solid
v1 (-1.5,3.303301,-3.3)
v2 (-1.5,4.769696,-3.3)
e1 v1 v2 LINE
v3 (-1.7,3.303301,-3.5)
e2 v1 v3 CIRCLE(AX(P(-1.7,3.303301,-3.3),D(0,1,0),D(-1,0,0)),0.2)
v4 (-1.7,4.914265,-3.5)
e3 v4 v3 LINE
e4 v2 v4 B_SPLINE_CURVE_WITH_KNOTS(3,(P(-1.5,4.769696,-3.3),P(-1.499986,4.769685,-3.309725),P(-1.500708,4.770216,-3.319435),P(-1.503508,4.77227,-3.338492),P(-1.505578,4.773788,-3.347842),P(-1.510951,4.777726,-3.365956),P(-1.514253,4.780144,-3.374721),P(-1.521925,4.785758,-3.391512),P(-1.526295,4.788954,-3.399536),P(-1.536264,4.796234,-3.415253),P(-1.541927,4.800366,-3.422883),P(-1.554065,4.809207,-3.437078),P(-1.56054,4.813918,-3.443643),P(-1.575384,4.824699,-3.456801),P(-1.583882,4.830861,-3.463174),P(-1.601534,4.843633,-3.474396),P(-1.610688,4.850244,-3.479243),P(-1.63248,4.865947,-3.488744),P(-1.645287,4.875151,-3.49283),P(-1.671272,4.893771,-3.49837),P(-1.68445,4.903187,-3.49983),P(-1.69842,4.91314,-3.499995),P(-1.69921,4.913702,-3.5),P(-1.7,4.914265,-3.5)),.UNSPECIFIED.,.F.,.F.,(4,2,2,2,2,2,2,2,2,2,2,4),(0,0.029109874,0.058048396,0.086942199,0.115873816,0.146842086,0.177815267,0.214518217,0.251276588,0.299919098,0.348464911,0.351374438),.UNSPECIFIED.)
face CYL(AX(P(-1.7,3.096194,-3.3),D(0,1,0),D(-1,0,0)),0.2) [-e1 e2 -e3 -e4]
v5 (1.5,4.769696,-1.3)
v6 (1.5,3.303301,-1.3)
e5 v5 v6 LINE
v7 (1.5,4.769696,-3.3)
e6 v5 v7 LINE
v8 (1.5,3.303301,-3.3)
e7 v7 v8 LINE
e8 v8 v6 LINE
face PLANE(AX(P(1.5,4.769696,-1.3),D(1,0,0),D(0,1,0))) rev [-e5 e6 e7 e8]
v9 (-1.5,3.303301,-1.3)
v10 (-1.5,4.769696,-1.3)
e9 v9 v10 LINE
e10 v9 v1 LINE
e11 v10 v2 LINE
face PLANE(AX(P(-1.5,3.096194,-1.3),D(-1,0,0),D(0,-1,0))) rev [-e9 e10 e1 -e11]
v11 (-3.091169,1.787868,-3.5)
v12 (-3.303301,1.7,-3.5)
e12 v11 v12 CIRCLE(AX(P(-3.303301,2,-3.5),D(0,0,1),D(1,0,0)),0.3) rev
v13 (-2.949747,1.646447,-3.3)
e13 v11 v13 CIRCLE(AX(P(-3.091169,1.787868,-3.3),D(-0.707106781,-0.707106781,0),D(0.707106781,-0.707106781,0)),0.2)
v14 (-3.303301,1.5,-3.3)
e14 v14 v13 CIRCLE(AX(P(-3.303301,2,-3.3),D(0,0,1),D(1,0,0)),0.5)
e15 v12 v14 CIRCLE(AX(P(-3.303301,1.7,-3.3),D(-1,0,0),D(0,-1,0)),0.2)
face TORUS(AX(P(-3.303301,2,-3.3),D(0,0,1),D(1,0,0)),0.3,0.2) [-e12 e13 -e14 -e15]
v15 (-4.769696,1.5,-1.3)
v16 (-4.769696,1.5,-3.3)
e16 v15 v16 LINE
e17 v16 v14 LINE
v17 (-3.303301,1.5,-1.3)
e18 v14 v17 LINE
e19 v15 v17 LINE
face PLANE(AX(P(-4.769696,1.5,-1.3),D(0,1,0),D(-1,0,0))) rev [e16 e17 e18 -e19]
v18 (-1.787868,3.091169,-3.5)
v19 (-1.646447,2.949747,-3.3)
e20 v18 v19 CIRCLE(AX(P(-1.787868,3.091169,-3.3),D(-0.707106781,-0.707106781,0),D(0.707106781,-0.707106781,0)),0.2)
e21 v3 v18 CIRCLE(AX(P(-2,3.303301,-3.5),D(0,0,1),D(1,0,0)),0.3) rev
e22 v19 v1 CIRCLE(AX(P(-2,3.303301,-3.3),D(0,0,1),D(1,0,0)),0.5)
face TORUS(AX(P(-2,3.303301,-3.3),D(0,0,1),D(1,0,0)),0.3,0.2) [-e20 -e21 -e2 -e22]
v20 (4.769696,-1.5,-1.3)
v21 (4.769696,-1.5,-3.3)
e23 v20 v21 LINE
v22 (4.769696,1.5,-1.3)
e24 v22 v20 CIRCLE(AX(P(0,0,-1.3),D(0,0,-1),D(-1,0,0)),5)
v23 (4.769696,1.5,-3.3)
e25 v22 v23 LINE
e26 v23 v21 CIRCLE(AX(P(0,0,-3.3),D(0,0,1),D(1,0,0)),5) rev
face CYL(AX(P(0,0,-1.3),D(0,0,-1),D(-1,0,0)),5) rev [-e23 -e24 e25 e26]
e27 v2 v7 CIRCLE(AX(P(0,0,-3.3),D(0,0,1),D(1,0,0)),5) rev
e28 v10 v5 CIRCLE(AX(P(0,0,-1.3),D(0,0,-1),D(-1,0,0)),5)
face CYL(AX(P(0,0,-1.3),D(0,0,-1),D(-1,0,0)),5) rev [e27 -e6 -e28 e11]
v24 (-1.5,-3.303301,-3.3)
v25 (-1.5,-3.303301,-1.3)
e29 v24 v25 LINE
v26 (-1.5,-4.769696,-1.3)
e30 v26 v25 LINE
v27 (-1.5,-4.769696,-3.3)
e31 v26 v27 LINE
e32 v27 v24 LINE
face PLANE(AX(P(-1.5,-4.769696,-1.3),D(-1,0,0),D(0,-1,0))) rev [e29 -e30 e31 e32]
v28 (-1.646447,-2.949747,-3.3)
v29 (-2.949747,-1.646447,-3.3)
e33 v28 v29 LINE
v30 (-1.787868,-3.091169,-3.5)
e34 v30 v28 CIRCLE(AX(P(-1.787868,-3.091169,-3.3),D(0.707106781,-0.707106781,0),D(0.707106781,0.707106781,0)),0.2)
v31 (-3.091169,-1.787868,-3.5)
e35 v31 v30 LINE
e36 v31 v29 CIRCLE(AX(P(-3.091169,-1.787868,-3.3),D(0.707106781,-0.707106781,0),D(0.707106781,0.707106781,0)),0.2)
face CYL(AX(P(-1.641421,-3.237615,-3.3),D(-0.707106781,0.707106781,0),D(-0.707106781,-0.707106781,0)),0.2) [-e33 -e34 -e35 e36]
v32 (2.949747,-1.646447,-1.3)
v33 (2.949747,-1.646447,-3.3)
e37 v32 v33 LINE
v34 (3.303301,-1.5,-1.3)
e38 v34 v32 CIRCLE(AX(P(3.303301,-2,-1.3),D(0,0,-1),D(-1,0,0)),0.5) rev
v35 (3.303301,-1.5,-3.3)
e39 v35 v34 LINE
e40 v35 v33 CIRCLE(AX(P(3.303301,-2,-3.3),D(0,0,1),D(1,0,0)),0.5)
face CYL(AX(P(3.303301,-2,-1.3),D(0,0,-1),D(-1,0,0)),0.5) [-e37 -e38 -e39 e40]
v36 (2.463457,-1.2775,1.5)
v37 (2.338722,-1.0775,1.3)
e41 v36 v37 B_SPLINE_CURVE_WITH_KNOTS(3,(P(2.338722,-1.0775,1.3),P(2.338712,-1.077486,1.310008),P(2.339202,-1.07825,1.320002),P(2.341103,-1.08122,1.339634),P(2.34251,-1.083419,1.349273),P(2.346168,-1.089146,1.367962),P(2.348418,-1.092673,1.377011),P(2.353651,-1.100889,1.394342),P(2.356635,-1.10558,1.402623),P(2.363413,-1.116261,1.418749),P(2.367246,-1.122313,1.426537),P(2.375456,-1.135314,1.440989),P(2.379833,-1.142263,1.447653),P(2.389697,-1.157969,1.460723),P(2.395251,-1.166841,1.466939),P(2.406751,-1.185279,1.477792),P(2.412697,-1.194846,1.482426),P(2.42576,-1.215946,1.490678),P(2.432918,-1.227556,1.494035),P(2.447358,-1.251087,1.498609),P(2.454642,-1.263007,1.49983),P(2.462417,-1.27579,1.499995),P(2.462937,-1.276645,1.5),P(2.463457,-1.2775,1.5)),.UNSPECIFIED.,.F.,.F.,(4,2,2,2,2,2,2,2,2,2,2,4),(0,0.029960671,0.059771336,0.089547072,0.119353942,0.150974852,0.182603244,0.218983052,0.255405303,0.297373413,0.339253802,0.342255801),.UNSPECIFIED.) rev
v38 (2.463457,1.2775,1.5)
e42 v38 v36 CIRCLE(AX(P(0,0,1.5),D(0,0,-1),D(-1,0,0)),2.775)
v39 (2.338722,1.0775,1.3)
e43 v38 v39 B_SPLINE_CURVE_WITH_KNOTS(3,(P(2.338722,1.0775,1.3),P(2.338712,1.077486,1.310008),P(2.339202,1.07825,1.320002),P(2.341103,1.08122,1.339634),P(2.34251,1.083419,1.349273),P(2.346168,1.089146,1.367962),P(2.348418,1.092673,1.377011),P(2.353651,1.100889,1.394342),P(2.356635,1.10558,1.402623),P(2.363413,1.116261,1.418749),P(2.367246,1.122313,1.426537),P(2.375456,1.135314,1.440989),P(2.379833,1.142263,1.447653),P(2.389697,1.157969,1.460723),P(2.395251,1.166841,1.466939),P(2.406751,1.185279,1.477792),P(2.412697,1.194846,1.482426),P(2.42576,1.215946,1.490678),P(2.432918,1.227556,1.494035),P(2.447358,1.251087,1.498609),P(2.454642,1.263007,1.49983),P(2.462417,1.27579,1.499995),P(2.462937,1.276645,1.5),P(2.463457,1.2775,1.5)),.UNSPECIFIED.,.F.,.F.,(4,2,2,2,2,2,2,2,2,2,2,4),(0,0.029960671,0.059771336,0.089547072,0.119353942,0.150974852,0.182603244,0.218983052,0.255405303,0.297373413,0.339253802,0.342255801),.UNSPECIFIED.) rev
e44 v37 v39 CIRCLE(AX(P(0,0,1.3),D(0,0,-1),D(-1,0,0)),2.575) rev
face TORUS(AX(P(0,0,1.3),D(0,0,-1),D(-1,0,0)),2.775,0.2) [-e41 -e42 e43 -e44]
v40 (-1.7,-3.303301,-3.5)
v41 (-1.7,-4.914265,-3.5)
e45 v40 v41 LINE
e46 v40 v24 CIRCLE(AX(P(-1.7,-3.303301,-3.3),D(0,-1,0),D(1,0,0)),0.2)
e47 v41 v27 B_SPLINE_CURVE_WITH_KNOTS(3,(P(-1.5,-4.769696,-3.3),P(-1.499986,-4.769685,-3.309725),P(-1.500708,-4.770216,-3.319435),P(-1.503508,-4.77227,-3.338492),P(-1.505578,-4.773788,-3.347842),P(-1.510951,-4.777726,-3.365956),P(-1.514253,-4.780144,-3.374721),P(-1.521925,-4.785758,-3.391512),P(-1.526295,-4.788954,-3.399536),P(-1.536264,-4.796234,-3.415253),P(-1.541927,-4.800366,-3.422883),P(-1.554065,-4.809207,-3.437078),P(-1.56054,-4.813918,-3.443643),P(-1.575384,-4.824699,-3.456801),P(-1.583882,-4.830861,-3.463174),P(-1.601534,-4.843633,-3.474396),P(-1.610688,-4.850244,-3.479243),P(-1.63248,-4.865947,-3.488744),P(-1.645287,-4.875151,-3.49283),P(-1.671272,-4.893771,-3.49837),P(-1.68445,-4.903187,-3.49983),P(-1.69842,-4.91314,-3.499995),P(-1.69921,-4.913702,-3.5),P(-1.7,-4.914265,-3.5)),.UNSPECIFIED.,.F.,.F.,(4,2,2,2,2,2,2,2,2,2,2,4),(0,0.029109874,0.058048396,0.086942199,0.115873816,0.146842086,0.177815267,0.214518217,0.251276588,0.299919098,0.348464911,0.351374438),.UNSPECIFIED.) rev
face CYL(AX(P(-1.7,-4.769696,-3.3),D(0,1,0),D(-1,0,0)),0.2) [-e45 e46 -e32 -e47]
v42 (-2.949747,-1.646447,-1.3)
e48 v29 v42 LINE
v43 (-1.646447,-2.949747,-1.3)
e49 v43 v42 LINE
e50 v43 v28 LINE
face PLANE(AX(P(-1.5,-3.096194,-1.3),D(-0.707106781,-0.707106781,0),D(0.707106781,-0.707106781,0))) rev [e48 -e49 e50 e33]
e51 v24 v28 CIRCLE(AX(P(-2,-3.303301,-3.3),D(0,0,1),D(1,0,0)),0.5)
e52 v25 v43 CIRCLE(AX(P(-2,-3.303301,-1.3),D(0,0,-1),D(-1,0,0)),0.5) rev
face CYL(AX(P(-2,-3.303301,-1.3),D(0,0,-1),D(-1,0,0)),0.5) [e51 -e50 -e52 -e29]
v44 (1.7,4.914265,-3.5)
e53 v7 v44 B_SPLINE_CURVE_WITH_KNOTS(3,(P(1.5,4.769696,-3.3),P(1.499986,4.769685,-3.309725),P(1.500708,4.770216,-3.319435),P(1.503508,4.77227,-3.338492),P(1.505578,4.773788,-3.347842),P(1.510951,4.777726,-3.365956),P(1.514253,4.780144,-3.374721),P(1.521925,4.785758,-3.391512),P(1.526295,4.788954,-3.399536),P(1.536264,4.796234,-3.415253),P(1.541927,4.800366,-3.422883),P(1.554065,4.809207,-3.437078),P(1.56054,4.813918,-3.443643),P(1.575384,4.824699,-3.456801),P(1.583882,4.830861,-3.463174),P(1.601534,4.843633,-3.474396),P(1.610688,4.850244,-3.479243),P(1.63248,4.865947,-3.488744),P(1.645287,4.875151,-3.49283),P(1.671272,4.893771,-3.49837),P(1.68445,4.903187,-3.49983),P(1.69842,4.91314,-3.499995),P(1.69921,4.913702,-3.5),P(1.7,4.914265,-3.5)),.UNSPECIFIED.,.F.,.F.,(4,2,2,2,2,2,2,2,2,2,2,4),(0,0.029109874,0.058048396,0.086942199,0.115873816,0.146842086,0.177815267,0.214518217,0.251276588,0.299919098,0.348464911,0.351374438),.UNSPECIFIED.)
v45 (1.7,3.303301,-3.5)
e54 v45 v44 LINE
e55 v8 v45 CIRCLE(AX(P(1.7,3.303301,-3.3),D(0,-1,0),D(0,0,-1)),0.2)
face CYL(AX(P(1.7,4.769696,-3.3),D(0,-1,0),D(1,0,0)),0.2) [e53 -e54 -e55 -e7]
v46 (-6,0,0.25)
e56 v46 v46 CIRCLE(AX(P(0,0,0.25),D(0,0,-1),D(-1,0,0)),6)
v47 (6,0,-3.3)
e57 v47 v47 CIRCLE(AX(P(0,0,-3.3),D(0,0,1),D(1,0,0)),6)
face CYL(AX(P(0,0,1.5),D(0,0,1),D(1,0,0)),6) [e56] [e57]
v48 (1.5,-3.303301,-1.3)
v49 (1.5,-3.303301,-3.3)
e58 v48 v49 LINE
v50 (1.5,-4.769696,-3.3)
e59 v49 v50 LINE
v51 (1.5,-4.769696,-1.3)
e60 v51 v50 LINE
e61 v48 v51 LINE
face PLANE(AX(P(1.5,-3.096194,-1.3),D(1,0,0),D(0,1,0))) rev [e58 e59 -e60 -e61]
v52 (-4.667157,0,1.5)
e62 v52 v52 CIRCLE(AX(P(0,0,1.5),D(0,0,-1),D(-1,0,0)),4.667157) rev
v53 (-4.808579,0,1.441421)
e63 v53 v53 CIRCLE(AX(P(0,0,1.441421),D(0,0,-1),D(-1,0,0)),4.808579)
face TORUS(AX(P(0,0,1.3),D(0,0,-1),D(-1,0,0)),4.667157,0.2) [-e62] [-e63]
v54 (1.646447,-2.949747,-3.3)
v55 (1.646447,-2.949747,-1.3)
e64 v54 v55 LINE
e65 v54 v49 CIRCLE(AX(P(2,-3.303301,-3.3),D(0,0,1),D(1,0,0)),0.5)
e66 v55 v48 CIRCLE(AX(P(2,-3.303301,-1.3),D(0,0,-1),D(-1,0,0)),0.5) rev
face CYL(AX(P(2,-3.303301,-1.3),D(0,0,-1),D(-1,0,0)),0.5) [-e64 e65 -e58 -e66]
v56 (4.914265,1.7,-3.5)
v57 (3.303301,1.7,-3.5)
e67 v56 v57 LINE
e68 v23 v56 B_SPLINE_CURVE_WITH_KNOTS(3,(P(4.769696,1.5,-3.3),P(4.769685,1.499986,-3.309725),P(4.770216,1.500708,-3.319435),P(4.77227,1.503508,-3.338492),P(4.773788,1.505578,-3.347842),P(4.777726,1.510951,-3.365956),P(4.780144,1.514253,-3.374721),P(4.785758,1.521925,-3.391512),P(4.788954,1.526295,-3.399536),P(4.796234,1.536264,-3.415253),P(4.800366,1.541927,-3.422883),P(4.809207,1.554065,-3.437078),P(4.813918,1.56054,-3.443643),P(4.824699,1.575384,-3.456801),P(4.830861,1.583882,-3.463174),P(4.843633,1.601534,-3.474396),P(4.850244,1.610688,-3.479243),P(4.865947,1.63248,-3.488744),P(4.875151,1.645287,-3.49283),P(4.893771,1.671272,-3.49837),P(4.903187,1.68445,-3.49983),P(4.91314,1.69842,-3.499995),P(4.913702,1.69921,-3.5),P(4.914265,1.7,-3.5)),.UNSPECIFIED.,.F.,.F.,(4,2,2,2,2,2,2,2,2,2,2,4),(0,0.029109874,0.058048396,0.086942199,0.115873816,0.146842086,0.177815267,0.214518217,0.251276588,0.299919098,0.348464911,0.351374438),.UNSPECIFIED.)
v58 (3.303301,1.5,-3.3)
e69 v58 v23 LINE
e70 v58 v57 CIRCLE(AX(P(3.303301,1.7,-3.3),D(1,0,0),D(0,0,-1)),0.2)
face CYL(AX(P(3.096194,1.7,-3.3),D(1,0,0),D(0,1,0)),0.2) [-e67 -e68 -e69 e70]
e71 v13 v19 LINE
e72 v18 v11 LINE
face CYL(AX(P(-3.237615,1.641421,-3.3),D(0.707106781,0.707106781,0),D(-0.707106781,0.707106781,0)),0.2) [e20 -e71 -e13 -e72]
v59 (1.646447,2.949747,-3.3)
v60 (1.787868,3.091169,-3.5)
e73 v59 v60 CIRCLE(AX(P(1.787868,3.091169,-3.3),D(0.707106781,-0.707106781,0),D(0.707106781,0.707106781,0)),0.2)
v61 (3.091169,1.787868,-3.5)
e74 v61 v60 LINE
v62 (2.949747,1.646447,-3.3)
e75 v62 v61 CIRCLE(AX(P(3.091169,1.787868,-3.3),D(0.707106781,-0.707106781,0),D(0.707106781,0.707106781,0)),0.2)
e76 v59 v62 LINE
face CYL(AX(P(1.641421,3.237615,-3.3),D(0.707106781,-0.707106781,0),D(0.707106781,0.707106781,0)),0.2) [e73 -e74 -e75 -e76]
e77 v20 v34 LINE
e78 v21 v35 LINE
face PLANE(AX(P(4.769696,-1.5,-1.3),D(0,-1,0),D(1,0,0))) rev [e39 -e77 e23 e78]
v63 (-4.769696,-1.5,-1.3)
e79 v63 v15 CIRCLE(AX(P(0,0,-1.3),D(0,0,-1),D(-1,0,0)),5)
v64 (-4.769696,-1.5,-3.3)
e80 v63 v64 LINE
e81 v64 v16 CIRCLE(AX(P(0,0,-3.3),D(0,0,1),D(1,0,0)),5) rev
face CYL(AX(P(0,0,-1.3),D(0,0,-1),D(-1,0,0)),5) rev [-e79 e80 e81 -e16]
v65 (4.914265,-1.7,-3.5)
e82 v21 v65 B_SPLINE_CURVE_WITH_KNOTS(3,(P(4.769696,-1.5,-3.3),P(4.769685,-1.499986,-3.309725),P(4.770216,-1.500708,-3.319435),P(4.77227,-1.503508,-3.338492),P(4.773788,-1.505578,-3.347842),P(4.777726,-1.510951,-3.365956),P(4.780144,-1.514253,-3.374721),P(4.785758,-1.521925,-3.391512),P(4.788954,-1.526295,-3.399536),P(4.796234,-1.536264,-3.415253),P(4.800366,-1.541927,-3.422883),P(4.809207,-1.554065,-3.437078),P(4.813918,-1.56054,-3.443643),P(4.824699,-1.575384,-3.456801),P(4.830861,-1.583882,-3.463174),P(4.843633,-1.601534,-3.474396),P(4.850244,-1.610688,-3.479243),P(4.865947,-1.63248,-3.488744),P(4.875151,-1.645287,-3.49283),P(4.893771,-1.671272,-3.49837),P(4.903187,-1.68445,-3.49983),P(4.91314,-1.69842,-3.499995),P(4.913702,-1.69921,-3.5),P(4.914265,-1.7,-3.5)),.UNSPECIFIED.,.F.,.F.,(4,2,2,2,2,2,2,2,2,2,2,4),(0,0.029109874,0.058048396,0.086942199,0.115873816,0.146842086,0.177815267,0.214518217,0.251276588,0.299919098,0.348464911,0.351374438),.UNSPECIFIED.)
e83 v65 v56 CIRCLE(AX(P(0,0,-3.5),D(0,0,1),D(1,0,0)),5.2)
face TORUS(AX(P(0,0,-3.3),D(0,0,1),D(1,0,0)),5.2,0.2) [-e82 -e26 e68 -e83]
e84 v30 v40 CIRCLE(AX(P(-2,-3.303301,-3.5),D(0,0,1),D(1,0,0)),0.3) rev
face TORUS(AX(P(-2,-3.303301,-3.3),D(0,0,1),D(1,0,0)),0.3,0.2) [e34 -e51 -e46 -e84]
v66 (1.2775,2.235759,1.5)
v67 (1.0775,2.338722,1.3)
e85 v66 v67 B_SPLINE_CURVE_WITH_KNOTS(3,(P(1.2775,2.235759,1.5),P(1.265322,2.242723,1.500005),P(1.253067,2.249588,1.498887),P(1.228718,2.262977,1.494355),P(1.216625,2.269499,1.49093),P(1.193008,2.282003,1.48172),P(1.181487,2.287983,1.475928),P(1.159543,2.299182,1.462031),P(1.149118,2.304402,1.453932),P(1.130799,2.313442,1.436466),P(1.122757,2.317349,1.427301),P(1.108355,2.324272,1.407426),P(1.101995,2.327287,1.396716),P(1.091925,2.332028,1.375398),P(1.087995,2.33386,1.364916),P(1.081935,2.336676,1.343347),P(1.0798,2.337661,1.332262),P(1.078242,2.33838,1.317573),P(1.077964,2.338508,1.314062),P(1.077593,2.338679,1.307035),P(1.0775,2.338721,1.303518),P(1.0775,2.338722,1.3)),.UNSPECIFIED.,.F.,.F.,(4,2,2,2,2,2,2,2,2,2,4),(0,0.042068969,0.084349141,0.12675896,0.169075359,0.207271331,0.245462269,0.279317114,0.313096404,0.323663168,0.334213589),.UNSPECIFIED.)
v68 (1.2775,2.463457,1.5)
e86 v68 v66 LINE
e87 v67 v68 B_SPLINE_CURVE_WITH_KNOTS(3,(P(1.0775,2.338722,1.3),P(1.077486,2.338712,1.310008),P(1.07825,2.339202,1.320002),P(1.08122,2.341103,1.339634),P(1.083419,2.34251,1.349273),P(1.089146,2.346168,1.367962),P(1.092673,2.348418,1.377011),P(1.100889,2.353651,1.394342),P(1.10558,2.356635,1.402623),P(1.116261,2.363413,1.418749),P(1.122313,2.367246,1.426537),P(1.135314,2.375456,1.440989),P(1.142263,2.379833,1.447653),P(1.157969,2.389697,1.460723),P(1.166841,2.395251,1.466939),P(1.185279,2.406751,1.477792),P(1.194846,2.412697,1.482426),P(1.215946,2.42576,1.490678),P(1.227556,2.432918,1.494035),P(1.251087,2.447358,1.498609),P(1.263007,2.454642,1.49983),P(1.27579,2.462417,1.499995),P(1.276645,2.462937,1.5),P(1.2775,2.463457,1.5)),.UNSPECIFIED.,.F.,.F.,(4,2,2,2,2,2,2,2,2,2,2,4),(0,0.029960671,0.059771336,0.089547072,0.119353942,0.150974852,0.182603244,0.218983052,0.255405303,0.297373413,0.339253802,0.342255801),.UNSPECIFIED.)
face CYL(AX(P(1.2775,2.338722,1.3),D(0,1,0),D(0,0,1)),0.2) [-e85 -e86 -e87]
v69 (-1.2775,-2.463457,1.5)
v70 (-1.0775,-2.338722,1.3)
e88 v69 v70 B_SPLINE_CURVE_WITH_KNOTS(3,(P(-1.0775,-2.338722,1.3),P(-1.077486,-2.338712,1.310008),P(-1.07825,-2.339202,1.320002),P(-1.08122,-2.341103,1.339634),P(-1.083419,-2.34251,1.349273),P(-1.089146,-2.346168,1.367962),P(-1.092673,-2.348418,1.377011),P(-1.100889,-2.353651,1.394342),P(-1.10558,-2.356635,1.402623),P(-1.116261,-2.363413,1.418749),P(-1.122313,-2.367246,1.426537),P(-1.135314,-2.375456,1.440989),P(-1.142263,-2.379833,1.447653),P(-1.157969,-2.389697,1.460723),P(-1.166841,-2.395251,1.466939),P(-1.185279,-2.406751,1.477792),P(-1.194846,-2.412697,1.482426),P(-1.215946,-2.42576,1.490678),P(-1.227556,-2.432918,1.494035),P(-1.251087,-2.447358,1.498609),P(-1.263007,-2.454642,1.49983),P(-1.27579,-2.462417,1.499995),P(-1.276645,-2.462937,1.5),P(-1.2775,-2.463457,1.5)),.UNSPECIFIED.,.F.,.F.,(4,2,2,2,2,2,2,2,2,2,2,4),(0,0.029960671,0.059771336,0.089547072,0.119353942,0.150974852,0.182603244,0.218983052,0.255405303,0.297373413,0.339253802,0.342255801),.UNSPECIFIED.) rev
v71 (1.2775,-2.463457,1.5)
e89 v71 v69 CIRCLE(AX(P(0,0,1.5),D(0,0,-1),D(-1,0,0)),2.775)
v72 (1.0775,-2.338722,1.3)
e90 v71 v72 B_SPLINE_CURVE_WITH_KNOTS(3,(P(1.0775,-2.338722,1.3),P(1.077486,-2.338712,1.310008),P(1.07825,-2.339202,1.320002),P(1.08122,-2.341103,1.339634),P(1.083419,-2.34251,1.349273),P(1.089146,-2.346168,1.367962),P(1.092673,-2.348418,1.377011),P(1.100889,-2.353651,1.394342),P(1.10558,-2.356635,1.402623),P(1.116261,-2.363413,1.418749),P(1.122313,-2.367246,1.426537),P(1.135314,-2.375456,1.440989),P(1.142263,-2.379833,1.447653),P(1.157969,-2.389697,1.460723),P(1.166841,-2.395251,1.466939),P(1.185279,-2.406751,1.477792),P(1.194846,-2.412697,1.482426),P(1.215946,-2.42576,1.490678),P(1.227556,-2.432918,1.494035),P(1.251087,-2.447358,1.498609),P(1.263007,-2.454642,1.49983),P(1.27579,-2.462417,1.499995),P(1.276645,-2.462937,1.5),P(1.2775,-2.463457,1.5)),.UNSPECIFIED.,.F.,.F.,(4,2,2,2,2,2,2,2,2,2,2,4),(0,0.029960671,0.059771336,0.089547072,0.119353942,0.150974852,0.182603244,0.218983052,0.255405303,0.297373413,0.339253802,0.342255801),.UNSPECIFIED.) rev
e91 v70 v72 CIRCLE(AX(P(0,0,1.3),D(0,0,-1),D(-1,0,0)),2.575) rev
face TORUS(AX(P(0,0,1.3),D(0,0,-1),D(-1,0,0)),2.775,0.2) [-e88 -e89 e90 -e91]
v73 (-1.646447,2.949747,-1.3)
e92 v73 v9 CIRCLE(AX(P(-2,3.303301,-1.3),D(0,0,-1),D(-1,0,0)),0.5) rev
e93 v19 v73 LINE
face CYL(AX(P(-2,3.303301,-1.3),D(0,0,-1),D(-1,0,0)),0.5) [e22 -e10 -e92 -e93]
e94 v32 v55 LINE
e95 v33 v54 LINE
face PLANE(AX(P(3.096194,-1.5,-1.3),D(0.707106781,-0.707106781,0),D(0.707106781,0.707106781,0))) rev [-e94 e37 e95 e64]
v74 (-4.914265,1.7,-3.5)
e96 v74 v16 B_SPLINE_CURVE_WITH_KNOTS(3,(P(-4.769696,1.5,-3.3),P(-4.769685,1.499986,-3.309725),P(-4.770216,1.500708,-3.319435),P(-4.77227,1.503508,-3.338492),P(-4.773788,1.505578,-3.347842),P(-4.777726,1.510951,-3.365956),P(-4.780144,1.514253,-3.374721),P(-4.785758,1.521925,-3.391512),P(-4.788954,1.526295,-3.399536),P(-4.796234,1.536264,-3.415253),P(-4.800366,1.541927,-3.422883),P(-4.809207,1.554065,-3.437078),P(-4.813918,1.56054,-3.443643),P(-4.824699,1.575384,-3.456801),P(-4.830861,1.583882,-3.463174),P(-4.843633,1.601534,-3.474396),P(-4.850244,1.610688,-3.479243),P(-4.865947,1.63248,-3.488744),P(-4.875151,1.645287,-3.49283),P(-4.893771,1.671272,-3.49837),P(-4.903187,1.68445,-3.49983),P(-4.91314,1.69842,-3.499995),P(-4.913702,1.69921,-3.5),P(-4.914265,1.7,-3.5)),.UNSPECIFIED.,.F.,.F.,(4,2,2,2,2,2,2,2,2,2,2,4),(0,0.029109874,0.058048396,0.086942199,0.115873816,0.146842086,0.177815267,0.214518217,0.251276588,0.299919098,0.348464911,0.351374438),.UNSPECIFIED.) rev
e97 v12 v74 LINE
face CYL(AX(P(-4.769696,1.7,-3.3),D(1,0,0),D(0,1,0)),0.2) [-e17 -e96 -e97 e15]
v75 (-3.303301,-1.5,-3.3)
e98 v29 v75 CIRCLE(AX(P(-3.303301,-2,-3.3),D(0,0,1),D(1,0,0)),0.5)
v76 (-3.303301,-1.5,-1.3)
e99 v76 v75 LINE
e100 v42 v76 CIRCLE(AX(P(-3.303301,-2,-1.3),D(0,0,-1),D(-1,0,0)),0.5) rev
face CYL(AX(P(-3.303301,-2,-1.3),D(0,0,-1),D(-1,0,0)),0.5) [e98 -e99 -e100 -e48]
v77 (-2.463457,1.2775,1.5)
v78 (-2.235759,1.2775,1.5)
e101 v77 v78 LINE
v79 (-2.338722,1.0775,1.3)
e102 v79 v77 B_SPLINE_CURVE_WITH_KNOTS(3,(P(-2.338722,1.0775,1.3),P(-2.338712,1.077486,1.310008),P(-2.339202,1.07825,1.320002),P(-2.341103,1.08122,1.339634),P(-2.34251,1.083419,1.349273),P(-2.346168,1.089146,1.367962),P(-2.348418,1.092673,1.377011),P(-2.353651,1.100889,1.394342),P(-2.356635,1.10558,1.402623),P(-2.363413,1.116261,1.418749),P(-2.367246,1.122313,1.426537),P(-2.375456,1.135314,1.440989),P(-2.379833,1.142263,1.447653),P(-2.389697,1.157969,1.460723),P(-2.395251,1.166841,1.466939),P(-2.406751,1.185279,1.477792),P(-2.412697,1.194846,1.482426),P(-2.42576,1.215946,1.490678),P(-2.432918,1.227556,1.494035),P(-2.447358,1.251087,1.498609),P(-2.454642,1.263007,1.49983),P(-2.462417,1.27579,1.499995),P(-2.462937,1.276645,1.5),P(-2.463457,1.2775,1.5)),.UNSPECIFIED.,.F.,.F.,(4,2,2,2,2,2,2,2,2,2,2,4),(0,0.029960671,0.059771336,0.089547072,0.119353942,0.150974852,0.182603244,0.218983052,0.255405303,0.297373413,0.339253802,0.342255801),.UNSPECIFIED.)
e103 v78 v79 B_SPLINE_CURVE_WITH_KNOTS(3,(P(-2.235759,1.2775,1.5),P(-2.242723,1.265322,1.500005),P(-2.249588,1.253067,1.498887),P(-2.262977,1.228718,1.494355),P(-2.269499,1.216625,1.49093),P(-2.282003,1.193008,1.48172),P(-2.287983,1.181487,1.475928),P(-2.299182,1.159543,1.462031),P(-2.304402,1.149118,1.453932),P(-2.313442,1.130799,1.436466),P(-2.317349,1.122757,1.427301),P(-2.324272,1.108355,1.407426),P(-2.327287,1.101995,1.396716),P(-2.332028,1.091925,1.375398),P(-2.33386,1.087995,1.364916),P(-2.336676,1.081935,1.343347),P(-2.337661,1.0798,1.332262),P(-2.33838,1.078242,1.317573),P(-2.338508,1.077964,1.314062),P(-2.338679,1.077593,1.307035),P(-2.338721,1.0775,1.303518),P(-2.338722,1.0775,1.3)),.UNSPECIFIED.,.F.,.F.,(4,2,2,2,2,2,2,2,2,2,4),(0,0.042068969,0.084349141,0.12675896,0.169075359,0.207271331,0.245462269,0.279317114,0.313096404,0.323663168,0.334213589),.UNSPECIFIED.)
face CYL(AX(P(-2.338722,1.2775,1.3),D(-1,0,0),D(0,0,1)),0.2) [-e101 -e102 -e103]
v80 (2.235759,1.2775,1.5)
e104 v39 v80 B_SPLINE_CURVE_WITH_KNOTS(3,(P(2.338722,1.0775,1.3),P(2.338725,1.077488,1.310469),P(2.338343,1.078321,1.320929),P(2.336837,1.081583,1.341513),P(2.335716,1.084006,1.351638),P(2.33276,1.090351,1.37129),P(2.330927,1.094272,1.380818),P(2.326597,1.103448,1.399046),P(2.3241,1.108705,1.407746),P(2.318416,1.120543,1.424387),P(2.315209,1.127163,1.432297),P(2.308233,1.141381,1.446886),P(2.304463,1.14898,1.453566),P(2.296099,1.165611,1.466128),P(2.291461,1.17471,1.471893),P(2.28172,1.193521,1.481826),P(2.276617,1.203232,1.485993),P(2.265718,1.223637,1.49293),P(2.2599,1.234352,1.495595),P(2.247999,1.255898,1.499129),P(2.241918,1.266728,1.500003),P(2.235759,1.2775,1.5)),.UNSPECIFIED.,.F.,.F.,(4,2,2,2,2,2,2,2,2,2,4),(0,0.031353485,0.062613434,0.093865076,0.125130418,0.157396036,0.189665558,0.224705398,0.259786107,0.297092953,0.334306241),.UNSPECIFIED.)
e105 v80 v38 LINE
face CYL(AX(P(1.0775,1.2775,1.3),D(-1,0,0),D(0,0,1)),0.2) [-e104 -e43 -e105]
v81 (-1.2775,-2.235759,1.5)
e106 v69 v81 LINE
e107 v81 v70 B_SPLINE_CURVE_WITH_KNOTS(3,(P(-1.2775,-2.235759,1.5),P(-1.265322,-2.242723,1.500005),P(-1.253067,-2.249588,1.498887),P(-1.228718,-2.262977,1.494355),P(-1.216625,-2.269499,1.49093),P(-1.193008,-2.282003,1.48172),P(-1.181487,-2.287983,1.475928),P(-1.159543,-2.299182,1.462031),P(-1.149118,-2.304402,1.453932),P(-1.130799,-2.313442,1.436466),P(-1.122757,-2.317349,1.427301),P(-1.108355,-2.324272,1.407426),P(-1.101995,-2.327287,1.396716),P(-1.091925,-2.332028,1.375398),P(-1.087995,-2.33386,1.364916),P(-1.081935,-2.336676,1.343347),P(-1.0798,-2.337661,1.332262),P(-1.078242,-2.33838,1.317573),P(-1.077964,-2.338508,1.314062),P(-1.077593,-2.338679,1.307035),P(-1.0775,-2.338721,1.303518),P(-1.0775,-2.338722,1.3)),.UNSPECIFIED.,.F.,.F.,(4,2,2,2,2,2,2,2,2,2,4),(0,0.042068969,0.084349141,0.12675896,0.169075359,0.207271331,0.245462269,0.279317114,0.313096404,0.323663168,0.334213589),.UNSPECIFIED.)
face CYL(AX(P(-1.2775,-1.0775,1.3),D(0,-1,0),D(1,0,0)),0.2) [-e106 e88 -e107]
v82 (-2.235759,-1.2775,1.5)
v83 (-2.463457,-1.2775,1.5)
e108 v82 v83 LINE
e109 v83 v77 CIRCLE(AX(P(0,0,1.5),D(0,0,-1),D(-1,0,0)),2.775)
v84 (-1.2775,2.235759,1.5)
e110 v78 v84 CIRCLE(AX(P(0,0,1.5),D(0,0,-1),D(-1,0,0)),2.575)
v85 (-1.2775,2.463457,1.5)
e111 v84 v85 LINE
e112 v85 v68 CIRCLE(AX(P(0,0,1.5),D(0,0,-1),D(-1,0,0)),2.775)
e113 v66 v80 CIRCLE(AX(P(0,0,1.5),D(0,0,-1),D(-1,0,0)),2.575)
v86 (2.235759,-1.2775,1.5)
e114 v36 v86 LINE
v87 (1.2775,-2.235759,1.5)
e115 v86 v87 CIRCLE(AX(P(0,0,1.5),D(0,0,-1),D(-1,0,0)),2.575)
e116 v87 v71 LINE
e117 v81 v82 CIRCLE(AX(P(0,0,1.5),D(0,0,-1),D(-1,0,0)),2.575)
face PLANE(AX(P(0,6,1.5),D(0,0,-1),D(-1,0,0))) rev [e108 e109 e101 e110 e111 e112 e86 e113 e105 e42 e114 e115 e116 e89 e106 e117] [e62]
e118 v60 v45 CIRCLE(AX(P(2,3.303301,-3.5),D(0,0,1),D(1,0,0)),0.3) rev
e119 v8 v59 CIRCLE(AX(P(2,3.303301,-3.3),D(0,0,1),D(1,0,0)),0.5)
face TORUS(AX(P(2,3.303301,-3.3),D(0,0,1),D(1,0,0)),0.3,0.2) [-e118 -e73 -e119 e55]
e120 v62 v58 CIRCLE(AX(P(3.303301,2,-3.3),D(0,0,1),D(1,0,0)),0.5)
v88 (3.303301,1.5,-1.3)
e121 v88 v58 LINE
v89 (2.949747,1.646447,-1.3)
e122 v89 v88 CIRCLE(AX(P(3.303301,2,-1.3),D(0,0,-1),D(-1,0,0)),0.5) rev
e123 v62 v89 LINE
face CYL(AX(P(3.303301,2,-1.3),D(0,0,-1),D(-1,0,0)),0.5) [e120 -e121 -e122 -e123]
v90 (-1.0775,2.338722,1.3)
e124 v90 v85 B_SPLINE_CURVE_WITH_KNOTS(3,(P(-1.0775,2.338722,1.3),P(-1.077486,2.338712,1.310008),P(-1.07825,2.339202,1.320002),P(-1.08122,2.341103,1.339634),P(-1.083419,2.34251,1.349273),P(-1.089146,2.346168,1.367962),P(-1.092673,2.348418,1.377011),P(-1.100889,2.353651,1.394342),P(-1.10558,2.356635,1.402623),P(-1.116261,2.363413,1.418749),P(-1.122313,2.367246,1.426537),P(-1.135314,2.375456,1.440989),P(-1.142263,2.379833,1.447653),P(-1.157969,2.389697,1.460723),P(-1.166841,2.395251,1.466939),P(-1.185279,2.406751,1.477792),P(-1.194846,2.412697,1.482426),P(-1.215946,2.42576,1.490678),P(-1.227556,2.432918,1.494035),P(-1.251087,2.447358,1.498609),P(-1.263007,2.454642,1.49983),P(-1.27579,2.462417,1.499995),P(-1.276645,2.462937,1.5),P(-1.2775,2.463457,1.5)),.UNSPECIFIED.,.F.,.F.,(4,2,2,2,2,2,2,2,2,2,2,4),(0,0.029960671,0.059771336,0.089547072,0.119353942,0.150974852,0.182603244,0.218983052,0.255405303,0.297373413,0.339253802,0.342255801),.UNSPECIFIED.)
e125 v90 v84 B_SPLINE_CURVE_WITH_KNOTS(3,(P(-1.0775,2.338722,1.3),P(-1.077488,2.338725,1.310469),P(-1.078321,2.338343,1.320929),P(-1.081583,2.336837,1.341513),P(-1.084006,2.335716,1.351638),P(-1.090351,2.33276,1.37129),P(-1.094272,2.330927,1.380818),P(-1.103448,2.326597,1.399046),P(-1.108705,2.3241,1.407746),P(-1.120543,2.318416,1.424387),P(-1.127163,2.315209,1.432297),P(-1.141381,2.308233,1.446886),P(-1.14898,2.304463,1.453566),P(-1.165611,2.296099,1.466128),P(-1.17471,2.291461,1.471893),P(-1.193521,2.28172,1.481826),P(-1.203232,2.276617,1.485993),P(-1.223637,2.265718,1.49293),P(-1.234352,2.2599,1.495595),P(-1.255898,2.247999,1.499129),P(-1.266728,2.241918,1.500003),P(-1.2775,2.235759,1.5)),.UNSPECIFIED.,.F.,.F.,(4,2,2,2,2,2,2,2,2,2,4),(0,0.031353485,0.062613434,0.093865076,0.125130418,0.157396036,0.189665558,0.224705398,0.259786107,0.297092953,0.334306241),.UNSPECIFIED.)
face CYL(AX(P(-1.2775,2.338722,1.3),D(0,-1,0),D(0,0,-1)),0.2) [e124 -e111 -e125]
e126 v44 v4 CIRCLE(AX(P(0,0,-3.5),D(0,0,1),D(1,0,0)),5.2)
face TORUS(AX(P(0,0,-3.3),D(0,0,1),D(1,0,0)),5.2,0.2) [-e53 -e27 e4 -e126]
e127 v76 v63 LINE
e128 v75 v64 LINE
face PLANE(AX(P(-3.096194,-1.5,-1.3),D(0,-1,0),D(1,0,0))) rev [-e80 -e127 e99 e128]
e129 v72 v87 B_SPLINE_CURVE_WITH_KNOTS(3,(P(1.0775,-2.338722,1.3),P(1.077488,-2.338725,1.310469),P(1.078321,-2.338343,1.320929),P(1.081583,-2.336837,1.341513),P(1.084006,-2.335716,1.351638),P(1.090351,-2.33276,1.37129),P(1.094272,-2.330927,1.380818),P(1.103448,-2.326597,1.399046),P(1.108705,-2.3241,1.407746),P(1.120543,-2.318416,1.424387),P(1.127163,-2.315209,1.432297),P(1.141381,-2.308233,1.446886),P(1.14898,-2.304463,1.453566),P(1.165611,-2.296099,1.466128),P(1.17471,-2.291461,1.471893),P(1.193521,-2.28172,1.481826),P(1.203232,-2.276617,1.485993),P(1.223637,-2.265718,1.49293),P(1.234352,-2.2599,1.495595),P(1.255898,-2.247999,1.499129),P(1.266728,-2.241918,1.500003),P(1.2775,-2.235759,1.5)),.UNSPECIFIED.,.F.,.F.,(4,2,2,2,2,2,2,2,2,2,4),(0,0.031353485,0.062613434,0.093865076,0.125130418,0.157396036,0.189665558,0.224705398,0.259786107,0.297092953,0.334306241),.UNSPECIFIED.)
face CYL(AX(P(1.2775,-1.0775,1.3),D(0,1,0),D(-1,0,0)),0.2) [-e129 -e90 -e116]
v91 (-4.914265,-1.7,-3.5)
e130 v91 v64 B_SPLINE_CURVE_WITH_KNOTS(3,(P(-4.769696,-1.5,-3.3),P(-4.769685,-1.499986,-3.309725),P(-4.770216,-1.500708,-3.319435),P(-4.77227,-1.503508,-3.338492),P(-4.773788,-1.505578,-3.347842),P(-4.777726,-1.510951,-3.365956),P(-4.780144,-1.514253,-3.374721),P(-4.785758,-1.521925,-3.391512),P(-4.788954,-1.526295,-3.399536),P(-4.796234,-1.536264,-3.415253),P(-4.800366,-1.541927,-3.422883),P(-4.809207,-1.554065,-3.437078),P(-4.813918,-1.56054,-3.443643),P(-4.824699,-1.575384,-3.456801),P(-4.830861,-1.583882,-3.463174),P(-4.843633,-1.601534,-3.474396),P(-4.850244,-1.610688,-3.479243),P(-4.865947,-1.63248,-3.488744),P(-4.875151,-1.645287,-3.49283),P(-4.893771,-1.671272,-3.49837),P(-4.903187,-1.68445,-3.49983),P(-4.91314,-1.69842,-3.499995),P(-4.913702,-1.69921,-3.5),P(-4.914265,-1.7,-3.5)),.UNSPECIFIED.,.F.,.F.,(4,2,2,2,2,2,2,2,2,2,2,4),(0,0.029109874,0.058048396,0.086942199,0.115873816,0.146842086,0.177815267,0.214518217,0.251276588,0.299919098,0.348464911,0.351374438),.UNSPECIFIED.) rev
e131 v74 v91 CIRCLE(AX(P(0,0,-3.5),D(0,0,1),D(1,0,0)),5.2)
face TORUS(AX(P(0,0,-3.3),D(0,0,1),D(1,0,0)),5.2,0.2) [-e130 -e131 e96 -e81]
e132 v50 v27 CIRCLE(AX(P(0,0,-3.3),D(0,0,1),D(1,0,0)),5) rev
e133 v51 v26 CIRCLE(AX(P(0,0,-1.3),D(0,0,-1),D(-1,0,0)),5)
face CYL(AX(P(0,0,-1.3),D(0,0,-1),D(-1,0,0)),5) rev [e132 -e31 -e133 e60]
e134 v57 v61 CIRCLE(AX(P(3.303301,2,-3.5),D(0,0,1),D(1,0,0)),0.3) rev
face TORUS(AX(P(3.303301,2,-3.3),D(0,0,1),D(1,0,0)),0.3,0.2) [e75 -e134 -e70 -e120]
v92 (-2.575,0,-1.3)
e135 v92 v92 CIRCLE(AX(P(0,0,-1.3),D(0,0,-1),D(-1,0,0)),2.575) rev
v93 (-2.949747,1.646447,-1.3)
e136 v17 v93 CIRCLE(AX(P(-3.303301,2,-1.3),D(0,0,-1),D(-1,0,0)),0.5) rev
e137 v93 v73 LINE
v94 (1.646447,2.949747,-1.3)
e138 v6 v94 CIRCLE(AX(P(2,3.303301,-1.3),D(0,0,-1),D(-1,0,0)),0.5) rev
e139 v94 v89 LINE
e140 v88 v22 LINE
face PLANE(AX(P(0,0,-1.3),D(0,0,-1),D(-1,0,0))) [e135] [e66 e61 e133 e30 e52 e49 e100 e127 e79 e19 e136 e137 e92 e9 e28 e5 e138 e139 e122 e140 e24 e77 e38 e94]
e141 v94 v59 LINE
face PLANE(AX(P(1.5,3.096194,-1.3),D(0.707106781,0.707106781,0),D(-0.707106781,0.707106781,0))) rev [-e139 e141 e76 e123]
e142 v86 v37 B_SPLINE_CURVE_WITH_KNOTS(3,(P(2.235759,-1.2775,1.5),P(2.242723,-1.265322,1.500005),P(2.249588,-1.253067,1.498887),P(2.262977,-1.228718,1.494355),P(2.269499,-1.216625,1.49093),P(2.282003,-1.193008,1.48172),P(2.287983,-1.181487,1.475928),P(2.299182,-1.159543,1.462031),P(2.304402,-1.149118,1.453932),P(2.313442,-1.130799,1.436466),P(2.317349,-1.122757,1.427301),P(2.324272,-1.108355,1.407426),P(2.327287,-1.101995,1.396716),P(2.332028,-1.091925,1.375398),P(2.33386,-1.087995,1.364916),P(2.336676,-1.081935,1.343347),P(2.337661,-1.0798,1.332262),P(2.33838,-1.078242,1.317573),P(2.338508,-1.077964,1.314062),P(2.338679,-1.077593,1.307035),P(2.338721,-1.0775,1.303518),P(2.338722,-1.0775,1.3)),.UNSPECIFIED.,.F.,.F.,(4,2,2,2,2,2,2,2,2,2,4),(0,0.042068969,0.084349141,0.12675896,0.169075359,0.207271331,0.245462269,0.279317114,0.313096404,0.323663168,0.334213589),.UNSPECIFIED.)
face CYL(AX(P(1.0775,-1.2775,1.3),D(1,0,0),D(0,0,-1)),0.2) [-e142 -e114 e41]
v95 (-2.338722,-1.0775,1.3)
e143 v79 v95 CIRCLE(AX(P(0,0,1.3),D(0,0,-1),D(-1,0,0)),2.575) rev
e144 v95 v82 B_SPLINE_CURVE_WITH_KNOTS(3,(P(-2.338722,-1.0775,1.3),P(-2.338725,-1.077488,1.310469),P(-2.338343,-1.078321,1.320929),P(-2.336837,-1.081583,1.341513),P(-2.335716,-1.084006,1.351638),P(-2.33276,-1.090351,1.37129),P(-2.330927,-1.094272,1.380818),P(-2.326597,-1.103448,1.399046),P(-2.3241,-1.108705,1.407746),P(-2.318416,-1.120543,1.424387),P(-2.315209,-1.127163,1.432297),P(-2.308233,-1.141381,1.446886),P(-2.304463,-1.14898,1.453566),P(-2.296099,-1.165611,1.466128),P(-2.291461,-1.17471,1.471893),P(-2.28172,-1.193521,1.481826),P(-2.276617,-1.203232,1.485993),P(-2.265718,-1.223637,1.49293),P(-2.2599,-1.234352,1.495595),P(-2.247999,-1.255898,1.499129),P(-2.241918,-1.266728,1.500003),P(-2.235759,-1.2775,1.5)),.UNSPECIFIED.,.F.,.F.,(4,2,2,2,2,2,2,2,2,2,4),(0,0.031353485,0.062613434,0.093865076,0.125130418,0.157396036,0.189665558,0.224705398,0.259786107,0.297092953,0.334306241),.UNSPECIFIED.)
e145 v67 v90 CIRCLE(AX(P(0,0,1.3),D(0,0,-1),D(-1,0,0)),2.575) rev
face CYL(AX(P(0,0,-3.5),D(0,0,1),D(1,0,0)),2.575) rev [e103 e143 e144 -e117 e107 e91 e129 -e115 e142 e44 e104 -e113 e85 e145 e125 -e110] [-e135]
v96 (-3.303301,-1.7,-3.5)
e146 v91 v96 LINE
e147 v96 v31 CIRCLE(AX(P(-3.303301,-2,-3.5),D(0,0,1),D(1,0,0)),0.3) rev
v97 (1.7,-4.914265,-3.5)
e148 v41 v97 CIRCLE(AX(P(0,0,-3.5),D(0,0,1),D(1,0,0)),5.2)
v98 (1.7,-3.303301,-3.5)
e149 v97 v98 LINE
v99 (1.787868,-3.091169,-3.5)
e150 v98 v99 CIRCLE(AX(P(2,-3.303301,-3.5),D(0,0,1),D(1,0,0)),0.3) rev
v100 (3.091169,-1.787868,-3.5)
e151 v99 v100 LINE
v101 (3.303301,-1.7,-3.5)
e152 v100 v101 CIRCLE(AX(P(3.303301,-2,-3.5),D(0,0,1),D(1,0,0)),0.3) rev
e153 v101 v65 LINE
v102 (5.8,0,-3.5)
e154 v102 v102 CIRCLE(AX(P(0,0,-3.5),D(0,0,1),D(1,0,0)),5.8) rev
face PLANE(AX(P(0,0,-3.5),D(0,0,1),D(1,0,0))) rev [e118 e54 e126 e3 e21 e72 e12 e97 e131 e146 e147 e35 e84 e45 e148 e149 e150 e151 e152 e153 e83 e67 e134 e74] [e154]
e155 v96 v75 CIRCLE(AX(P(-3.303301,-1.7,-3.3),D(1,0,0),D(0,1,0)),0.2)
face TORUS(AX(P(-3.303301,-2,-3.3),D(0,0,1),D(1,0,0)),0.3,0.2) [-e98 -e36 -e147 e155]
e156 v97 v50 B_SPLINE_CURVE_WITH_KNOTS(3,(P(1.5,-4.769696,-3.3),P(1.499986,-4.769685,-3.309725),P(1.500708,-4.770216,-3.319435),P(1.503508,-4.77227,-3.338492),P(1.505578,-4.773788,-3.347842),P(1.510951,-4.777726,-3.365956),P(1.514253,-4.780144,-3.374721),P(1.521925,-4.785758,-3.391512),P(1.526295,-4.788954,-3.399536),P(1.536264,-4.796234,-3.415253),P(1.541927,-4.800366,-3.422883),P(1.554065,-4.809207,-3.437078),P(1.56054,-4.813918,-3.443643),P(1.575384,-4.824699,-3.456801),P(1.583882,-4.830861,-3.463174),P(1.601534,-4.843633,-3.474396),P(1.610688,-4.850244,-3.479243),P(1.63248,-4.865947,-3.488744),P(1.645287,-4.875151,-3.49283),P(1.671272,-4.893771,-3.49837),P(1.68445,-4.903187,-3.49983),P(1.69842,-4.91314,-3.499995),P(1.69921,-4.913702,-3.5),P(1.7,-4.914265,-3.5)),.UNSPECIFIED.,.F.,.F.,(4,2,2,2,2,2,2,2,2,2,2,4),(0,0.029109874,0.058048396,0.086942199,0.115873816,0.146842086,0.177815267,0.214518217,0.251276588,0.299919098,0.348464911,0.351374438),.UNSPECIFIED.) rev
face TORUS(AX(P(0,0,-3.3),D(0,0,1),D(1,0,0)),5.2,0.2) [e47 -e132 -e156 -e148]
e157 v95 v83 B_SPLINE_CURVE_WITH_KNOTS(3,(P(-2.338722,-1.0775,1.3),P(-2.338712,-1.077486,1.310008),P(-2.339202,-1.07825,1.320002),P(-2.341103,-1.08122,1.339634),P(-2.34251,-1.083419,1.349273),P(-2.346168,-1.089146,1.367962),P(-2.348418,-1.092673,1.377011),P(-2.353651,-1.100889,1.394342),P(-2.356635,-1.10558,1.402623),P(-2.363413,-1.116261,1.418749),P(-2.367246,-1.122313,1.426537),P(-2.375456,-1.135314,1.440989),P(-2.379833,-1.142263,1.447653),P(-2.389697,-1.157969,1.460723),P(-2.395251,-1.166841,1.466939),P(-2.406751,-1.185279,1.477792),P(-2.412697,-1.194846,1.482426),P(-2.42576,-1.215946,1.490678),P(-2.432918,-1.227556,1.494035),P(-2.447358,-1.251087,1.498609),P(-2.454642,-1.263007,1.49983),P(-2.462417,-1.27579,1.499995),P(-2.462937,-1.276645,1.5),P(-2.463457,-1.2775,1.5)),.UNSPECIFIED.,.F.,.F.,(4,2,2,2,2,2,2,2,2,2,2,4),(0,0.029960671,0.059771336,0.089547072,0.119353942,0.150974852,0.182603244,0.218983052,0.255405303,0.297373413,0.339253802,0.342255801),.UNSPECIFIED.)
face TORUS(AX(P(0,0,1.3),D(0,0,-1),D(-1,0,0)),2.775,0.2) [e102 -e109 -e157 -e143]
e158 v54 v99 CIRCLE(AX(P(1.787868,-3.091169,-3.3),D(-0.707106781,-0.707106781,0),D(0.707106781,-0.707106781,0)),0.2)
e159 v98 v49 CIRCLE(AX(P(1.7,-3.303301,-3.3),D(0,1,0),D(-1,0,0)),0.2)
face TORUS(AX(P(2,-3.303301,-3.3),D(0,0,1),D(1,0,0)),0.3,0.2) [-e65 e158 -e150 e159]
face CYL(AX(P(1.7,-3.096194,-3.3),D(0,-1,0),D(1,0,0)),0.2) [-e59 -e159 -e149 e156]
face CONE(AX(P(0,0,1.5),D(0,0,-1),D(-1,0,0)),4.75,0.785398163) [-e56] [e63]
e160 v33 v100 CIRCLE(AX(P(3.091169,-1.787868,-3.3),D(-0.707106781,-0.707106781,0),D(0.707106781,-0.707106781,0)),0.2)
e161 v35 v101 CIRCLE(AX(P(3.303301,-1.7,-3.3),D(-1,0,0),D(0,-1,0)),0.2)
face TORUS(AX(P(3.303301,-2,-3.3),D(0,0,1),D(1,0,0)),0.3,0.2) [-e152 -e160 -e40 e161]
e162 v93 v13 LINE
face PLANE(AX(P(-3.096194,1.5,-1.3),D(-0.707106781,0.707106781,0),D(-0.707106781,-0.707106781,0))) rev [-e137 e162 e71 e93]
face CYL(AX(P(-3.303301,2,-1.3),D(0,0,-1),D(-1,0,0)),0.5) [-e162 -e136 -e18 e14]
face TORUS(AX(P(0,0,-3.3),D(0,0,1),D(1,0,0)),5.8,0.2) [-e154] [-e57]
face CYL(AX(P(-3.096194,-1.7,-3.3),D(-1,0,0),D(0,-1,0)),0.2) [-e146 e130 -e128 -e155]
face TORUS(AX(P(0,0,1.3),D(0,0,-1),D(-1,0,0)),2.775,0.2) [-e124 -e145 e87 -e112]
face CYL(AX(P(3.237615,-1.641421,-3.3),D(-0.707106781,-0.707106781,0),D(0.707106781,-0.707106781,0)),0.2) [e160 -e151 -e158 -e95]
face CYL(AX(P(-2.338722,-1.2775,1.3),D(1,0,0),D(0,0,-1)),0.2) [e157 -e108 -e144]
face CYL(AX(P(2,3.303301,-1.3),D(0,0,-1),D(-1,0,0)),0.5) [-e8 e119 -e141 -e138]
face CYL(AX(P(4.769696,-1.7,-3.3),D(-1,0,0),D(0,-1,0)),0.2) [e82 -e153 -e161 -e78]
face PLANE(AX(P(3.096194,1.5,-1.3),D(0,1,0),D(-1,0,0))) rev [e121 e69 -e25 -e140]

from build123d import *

# Parameters (mm, degrees)
CUT_EXTRUDE1_DEPTH      = 10.178779875
CUT_EXTRUDE1_DEPTH_BACK = 10.178779875
CUT_EXTRUDE2_DEPTH      = 2.2
FILLET1_R               = 0.5
CHAMFER1_SIZE           = 1.25
FILLET2_R               = 0.2
CUT_EXTRUDE3_DEPTH      = 9.935323193
CUT_EXTRUDE3_DEPTH_BACK = 9.935323193
SKETCH5_R               = 2.575


with BuildPart() as part:
    # Sketch3 → Revolve1 (revolve)
    with BuildSketch(Plane(origin=(0, 0, 0), x_dir=(0, 0, -1), z_dir=(1, 0, 0))):
        Polygon((-1.5, 0), (3.5, 0), (3.5, 6), (1, 6), (-1.5, 6), (-1.5, 3.75), align=None)
    revolve(axis=Axis((0, 0, 1.5), (0, 0, -1)))

    # Sketch2 → Cut-Extrude1 (cut, two sides: drawn at the far end of the back side and taken through both)
    with BuildSketch(Plane.XY.offset(-CUT_EXTRUDE1_DEPTH_BACK)):
        with BuildLine():
            Line((1.0775, 1.0775), (2.338721606, 1.0775))
            ThreePointArc((2.338721606, 1.0775), (2.575, 0), (2.338721606, -1.0775))
            Line((2.338721606, -1.0775), (1.0775, -1.0775))
            Line((1.0775, -1.0775), (1.0775, -2.338721606))
            ThreePointArc((1.0775, -2.338721606), (0, -2.575), (-1.0775, -2.338721606))
            Line((-1.0775, -2.338721606), (-1.0775, -1.0775))
            Line((-1.0775, -1.0775), (-2.338721606, -1.0775))
            ThreePointArc((-2.338721606, -1.0775), (-2.575, 0), (-2.338721606, 1.0775))
            Line((-2.338721606, 1.0775), (-1.0775, 1.0775))
            Line((-1.0775, 1.0775), (-1.0775, 2.338721606))
            ThreePointArc((-1.0775, 2.338721606), (0, 2.575), (1.0775, 2.338721606))
            Line((1.0775, 2.338721606), (1.0775, 1.0775))
        make_face()
    extrude(amount=CUT_EXTRUDE1_DEPTH + CUT_EXTRUDE1_DEPTH_BACK, mode=Mode.SUBTRACT)

    # Sketch4 → Cut-Extrude2 (cut)
    with BuildSketch(Plane(origin=(0, 0, -3.5), x_dir=(-1, 0, 0), z_dir=(0, 0, -1))):
        with BuildLine():
            Line((-1.5, 4.769696007), (-1.5, 3.096194078))
            Line((-1.5, 3.096194078), (-3.096194078, 1.5))
            Line((-3.096194078, 1.5), (-4.769696007, 1.5))
            ThreePointArc((-4.769696007, 1.5), (-4.942088629, 0.758788496), (-5, 0))
            ThreePointArc((-5, 0), (-4.942088629, -0.758788496), (-4.769696007, -1.5))
            Line((-4.769696007, -1.5), (-3.096194078, -1.5))
            Line((-3.096194078, -1.5), (-1.5, -3.096194078))
            Line((-1.5, -3.096194078), (-1.5, -4.769696007))
            ThreePointArc((-1.5, -4.769696007), (-0.758788496, -4.942088629), (0, -5))
            ThreePointArc((0, -5), (0.758788496, -4.942088629), (1.5, -4.769696007))
            Line((1.5, -4.769696007), (1.5, -3.096194078))
            Line((1.5, -3.096194078), (3.096194078, -1.5))
            Line((3.096194078, -1.5), (4.769696007, -1.5))
            ThreePointArc((4.769696007, -1.5), (4.942088629, -0.758788496), (5, 0))
            ThreePointArc((5, 0), (4.942088629, 0.758788496), (4.769696007, 1.5))
            Line((4.769696007, 1.5), (3.096194078, 1.5))
            Line((3.096194078, 1.5), (1.5, 3.096194078))
            Line((1.5, 3.096194078), (1.5, 4.769696007))
            ThreePointArc((1.5, 4.769696007), (0.758788496, 4.942088629), (0, 5))
            ThreePointArc((0, 5), (-0.758788496, 4.942088629), (-1.5, 4.769696007))
        make_face()
    extrude(amount=-CUT_EXTRUDE2_DEPTH, mode=Mode.SUBTRACT)

    # Fillet1
    fillet1_edges = [part.edges().sort_by_distance(p)[0] for p in [
        (3.096194078, -1.5, -2.4),
        (1.5, -3.096194078, -2.4),
        (-1.5, -3.096194078, -2.4),
        (-3.096194078, -1.5, -2.4),
        (-3.096194078, 1.5, -2.4),
        (-1.5, 3.096194078, -2.4),
        (1.5, 3.096194078, -2.4),
        (3.096194078, 1.5, -2.4),
    ]]
    fillet(fillet1_edges, radius=FILLET1_R)

    # Chamfer1
    chamfer1_edges = [part.edges().sort_by_distance(p)[0] for p in [
        (0, -6, 1.5),
    ]]
    chamfer(chamfer1_edges, length=CHAMFER1_SIZE)

    # Fillet2
    fillet2_edges = [part.edges().sort_by_distance(p)[0] for p in [
        (-1.0775, -1.708110803, 1.5),
        (0, -2.575, 1.5),
        (1.0775, -1.708110803, 1.5),
        (1.708110803, -1.0775, 1.5),
        (2.575, 0, 1.5),
        (1.708110803, 1.0775, 1.5),
        (1.0775, 1.708110803, 1.5),
        (0, 2.575, 1.5),
        (-1.0775, 1.708110803, 1.5),
        (-1.708110803, 1.0775, 1.5),
        (-2.575, 0, 1.5),
        (-1.708110803, -1.0775, 1.5),
        (0, -6, -3.5),
        (1.538060234, -3.111959143, -3.5),
        (1.5, -4.036498433, -3.5),
        (0, -5, -3.5),
        (-1.5, -4.036498433, -3.5),
        (-1.538060234, -3.111959143, -3.5),
        (-2.298097039, -2.298097039, -3.5),
        (-3.111959143, -1.538060234, -3.5),
        (-4.036498433, -1.5, -3.5),
        (-5, 0, -3.5),
        (-4.036498433, 1.5, -3.5),
        (-3.111959143, 1.538060234, -3.5),
        (-2.298097039, 2.298097039, -3.5),
        (-1.538060234, 3.111959143, -3.5),
        (-1.5, 4.036498433, -3.5),
        (0, 5, -3.5),
        (1.5, 4.036498433, -3.5),
        (1.538060234, 3.111959143, -3.5),
        (2.298097039, 2.298097039, -3.5),
        (3.111959143, 1.538060234, -3.5),
        (4.036498433, 1.5, -3.5),
        (5, 0, -3.5),
        (4.036498433, -1.5, -3.5),
        (3.111959143, -1.538060234, -3.5),
        (2.298097039, -2.298097039, -3.5),
        (0, -4.75, 1.5),
    ]]
    fillet(fillet2_edges, radius=FILLET2_R)

    # Sketch5 → Cut-Extrude3 (cut, two sides: drawn at the far end of the back side and taken through both)
    with BuildSketch(Plane(origin=(0, 0, -1.3), x_dir=(-1, 0, 0), z_dir=(0, 0, -1)).offset(-CUT_EXTRUDE3_DEPTH_BACK)):
        Circle(SKETCH5_R)
    extrude(amount=CUT_EXTRUDE3_DEPTH + CUT_EXTRUDE3_DEPTH_BACK, mode=Mode.SUBTRACT)


solid = part.part
